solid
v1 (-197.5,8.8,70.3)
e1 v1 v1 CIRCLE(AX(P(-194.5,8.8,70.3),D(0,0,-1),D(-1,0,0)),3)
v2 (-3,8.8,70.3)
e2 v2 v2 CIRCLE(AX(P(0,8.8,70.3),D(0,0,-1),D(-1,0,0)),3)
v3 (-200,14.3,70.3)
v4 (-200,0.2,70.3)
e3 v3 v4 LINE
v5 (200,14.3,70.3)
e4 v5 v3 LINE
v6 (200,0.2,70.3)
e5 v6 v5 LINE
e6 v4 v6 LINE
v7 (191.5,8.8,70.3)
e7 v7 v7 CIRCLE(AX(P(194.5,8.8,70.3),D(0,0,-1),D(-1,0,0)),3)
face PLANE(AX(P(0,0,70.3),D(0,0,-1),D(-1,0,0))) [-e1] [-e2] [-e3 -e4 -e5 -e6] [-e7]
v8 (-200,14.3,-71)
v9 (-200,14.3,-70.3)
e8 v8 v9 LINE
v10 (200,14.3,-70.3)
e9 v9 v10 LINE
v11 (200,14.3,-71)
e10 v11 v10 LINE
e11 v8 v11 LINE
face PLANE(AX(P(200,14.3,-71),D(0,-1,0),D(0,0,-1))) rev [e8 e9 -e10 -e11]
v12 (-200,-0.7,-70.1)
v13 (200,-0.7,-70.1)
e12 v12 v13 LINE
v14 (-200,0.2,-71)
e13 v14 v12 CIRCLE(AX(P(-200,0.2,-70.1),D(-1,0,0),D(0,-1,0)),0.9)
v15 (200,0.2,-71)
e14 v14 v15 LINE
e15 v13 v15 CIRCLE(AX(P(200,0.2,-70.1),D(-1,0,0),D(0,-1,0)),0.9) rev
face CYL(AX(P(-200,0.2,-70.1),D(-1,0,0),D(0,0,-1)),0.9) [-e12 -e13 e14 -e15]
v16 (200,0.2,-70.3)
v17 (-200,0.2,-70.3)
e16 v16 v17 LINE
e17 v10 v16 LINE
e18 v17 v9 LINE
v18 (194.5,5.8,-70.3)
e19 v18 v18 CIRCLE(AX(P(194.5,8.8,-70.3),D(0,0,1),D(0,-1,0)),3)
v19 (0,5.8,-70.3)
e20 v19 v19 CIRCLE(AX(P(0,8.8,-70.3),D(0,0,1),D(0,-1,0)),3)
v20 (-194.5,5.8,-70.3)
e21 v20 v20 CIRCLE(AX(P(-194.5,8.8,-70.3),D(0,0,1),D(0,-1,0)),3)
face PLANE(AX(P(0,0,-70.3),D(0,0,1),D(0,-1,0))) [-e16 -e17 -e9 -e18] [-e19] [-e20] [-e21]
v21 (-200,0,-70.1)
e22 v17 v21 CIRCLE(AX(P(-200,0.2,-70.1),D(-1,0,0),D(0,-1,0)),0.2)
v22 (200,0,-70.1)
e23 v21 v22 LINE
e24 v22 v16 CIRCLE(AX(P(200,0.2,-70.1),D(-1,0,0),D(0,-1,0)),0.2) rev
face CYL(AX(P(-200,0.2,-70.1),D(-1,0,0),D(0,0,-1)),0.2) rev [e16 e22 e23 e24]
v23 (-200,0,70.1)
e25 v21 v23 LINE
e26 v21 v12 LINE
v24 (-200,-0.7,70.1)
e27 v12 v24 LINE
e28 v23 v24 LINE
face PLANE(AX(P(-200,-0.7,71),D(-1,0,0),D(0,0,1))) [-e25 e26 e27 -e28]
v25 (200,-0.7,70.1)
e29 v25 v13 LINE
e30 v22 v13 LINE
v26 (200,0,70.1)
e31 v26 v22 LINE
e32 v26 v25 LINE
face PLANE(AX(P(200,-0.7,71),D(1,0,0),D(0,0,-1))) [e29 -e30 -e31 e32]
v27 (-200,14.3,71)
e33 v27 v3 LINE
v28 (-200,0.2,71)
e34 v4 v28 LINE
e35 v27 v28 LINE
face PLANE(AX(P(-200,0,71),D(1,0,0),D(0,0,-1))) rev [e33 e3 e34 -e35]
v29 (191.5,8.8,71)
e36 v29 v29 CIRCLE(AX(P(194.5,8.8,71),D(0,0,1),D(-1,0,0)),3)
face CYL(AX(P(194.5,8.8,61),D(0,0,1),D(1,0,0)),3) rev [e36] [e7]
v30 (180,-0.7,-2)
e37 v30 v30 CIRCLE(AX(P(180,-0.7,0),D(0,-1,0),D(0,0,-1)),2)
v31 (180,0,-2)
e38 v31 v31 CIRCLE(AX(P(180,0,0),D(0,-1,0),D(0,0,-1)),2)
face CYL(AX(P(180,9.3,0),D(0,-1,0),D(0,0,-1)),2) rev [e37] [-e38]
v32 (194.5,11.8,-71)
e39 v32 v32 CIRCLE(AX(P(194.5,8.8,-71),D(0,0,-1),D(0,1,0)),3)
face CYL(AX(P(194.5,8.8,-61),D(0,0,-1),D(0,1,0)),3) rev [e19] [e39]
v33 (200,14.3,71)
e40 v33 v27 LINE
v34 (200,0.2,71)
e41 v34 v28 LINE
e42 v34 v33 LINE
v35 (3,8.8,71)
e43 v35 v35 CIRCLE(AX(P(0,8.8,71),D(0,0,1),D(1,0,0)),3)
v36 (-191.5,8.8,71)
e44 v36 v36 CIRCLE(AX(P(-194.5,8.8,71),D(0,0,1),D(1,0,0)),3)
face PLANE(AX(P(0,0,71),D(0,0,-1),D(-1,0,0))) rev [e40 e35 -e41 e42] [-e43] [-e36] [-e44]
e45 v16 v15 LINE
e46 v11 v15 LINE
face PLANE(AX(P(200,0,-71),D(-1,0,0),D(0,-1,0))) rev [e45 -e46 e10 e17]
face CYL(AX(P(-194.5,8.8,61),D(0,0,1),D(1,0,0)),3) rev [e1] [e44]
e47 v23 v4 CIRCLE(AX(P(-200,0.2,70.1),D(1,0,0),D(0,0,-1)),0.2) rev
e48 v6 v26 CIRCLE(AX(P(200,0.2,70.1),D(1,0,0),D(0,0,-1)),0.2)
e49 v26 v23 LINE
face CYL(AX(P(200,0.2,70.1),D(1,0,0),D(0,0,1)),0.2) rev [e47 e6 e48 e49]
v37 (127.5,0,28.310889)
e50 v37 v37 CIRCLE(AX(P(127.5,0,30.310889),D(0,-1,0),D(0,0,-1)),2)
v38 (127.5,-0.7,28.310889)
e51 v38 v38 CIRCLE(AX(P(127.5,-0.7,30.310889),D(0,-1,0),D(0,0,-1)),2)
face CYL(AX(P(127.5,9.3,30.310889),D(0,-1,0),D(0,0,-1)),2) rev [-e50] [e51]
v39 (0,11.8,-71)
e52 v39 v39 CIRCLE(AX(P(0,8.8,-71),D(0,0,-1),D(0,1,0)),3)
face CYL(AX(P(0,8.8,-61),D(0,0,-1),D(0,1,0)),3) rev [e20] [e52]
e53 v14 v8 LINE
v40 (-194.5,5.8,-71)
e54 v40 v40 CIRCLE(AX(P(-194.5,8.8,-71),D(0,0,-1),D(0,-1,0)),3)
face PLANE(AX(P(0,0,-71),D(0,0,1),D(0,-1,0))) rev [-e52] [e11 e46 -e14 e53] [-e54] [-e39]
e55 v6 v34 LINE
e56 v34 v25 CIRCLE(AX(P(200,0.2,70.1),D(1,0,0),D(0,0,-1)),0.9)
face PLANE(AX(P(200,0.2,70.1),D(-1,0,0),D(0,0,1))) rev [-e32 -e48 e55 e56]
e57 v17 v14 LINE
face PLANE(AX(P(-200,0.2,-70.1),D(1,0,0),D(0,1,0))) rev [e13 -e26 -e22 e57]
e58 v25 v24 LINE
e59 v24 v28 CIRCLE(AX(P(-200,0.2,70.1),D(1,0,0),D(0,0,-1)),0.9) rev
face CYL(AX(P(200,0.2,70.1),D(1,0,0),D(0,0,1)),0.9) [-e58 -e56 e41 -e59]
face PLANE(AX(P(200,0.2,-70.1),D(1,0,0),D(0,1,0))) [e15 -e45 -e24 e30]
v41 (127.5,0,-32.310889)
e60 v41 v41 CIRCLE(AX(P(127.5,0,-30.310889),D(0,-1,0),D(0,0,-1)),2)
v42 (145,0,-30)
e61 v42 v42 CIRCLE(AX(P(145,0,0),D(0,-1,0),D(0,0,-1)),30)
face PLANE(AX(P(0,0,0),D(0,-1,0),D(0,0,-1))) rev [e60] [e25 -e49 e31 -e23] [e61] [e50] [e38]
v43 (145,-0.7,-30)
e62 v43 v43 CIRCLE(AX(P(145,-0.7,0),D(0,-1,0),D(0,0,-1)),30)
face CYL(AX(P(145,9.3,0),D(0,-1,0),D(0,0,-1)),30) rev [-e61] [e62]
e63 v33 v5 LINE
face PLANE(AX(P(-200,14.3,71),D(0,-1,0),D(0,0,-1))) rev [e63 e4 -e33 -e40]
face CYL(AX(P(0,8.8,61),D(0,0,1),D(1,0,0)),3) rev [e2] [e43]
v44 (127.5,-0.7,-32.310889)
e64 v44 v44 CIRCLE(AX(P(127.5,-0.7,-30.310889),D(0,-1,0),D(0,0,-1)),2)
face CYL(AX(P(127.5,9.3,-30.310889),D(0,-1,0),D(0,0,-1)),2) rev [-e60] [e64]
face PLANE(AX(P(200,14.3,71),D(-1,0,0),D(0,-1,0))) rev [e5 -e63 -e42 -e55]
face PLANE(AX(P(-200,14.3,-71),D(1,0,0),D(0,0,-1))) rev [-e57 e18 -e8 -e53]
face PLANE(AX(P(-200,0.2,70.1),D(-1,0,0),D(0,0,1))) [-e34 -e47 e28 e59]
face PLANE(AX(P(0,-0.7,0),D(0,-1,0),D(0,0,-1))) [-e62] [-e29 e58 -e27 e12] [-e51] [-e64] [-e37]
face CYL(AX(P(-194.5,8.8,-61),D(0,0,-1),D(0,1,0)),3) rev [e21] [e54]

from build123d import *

# Parameters (mm, degrees)
SKETCH_1_W                         = 400
SKETCH_1_H                         = 142
SM_BASE_FLANGE_1_DEPTH             = 0.7
SM_EDGE_FLANGE_1_STRIP_W           = 3.2
SM_EDGE_FLANGE_1_STRIP_H           = 0.7
SM_EDGE_FLANGE_1_STRIP_CUT_DEPTH   = 400
SM_EDGE_FLANGE_1_STRIP_2_W         = 3.2
SM_EDGE_FLANGE_1_STRIP_2_H         = 0.7
SM_EDGE_FLANGE_1_STRIP_CUT_2_DEPTH = 400
SM_EDGE_FLANGE_1_DEPTH             = 400
SM_EDGE_FLANGE_1_BEND_DEPTH        = 400
SKETCH_17_R                        = 3
CUT_EXTRUDE_1_DEPTH                = 10
CUT_EXTRUDE_START                  = -10
SKETCH_18_R                        = 3
CUT_EXTRUDE_2_DEPTH                = 10
SKETCH_19_R                        = 30
SKETCH_19_R_2                      = 2
CUT_EXTRUDE_4_DEPTH                = 10


# Sheet-metal steps are written as plain solids
with BuildPart() as part:
    # 草图1 → 基体-法兰1 (new body)
    with BuildSketch(Plane(origin=(0, 0, 0), x_dir=(1, 0, 0), z_dir=(0, 1, 0))):
        Rectangle(SKETCH_1_W, SKETCH_1_H)
    extrude(amount=-SM_BASE_FLANGE_1_DEPTH)

    # 边线-法兰1 strip (across the edge) → 边线-法兰1 strip cut (cut)
    with BuildSketch(Plane(origin=(200, 0, -71), x_dir=(0, 0, 1), z_dir=(-1, 0, 0))):
        with Locations((-0.7, -0.35)):
            Rectangle(SM_EDGE_FLANGE_1_STRIP_W, SM_EDGE_FLANGE_1_STRIP_H)
    extrude(amount=SM_EDGE_FLANGE_1_STRIP_CUT_DEPTH, mode=Mode.SUBTRACT)

    # 边线-法兰1 strip 2 (across the edge) → 边线-法兰1 strip cut 2 (cut)
    with BuildSketch(Plane(origin=(-200, 0, 71), x_dir=(0, 0, -1), z_dir=(1, 0, 0))):
        with Locations((-0.7, -0.35)):
            Rectangle(SM_EDGE_FLANGE_1_STRIP_2_W, SM_EDGE_FLANGE_1_STRIP_2_H)
    extrude(amount=SM_EDGE_FLANGE_1_STRIP_CUT_2_DEPTH, mode=Mode.SUBTRACT)

    # 边线-法兰1 section (across the edge) → 边线-法兰1 (add)
    with BuildSketch(Plane(origin=(200, 0, -71), x_dir=(0, 0, 1), z_dir=(-1, 0, 0))):
        with BuildLine():
            Line((0, 0.2), (0, 14.3))
            Line((0, 14.3), (0.7, 14.3))
            Line((0.7, 14.3), (0.7, 0.2))
            ThreePointArc((0.7, 0.2), (0.758578644, 0.058578644), (0.9, 0))
            Line((0.9, 0), (0.9, -0.7))
            ThreePointArc((0.9, -0.7), (0.263603897, -0.436396103), (0, 0.2))
        make_face()
    extrude(amount=SM_EDGE_FLANGE_1_DEPTH)

    # 边线-法兰1 section 2 (across the edge) → 边线-法兰1 bend (add)
    with BuildSketch(Plane(origin=(-200, 0, 71), x_dir=(0, 0, -1), z_dir=(1, 0, 0))):
        with BuildLine():
            Line((0, 0.2), (0, 14.3))
            Line((0, 14.3), (0.7, 14.3))
            Line((0.7, 14.3), (0.7, 0.2))
            ThreePointArc((0.7, 0.2), (0.758578644, 0.058578644), (0.9, 0))
            Line((0.9, 0), (0.9, -0.7))
            ThreePointArc((0.9, -0.7), (0.263603897, -0.436396103), (0, 0.2))
        make_face()
    extrude(amount=SM_EDGE_FLANGE_1_BEND_DEPTH)

    # 草图17 → 切除-拉伸1 (cut)
    with BuildSketch(Plane(origin=(0, 0, -71), x_dir=(-1, 0, 0), z_dir=(0, 0, -1))):
        with Locations(Location((-194.5, 8.8, 0), (0, 0, 90))):
            Circle(SKETCH_17_R)
        with Locations(Location((0, 8.8, 0), (0, 0, 90))):
            Circle(SKETCH_17_R)
        with Locations(Location((194.5, 8.8, 0), (0, 0, 270))):
            Circle(SKETCH_17_R)
    extrude(amount=-CUT_EXTRUDE_1_DEPTH, mode=Mode.SUBTRACT)

    # 草图18 → 切除-拉伸2 (cut)
    with BuildSketch(Plane.XY.offset(71).offset(CUT_EXTRUDE_START)):
        with Locations(Location((-194.5, 8.8, 0), (0, 0, 270))):
            Circle(SKETCH_18_R)
        with Locations(Location((0, 8.8, 0), (0, 0, 90))):
            Circle(SKETCH_18_R)
        with Locations(Location((194.5, 8.8, 0), (0, 0, 90))):
            Circle(SKETCH_18_R)
    extrude(amount=CUT_EXTRUDE_2_DEPTH, mode=Mode.SUBTRACT)

    # 草图19 → 切除-拉伸4 (cut)
    with BuildSketch(Plane.XZ.offset(0.7)):
        with Locations(Location((145, 0, 0), (0, 0, 270))):
            Circle(SKETCH_19_R)
        with Locations(Location((127.5, 30.310889132, 0), (0, 0, 270))):
            Circle(SKETCH_19_R_2)
        with Locations(Location((180, 0, 0), (0, 0, 270))):
            Circle(SKETCH_19_R_2)
        with Locations(Location((127.5, -30.310889132, 0), (0, 0, 270))):
            Circle(SKETCH_19_R_2)
    extrude(amount=-CUT_EXTRUDE_4_DEPTH, mode=Mode.SUBTRACT)


solid = part.part
